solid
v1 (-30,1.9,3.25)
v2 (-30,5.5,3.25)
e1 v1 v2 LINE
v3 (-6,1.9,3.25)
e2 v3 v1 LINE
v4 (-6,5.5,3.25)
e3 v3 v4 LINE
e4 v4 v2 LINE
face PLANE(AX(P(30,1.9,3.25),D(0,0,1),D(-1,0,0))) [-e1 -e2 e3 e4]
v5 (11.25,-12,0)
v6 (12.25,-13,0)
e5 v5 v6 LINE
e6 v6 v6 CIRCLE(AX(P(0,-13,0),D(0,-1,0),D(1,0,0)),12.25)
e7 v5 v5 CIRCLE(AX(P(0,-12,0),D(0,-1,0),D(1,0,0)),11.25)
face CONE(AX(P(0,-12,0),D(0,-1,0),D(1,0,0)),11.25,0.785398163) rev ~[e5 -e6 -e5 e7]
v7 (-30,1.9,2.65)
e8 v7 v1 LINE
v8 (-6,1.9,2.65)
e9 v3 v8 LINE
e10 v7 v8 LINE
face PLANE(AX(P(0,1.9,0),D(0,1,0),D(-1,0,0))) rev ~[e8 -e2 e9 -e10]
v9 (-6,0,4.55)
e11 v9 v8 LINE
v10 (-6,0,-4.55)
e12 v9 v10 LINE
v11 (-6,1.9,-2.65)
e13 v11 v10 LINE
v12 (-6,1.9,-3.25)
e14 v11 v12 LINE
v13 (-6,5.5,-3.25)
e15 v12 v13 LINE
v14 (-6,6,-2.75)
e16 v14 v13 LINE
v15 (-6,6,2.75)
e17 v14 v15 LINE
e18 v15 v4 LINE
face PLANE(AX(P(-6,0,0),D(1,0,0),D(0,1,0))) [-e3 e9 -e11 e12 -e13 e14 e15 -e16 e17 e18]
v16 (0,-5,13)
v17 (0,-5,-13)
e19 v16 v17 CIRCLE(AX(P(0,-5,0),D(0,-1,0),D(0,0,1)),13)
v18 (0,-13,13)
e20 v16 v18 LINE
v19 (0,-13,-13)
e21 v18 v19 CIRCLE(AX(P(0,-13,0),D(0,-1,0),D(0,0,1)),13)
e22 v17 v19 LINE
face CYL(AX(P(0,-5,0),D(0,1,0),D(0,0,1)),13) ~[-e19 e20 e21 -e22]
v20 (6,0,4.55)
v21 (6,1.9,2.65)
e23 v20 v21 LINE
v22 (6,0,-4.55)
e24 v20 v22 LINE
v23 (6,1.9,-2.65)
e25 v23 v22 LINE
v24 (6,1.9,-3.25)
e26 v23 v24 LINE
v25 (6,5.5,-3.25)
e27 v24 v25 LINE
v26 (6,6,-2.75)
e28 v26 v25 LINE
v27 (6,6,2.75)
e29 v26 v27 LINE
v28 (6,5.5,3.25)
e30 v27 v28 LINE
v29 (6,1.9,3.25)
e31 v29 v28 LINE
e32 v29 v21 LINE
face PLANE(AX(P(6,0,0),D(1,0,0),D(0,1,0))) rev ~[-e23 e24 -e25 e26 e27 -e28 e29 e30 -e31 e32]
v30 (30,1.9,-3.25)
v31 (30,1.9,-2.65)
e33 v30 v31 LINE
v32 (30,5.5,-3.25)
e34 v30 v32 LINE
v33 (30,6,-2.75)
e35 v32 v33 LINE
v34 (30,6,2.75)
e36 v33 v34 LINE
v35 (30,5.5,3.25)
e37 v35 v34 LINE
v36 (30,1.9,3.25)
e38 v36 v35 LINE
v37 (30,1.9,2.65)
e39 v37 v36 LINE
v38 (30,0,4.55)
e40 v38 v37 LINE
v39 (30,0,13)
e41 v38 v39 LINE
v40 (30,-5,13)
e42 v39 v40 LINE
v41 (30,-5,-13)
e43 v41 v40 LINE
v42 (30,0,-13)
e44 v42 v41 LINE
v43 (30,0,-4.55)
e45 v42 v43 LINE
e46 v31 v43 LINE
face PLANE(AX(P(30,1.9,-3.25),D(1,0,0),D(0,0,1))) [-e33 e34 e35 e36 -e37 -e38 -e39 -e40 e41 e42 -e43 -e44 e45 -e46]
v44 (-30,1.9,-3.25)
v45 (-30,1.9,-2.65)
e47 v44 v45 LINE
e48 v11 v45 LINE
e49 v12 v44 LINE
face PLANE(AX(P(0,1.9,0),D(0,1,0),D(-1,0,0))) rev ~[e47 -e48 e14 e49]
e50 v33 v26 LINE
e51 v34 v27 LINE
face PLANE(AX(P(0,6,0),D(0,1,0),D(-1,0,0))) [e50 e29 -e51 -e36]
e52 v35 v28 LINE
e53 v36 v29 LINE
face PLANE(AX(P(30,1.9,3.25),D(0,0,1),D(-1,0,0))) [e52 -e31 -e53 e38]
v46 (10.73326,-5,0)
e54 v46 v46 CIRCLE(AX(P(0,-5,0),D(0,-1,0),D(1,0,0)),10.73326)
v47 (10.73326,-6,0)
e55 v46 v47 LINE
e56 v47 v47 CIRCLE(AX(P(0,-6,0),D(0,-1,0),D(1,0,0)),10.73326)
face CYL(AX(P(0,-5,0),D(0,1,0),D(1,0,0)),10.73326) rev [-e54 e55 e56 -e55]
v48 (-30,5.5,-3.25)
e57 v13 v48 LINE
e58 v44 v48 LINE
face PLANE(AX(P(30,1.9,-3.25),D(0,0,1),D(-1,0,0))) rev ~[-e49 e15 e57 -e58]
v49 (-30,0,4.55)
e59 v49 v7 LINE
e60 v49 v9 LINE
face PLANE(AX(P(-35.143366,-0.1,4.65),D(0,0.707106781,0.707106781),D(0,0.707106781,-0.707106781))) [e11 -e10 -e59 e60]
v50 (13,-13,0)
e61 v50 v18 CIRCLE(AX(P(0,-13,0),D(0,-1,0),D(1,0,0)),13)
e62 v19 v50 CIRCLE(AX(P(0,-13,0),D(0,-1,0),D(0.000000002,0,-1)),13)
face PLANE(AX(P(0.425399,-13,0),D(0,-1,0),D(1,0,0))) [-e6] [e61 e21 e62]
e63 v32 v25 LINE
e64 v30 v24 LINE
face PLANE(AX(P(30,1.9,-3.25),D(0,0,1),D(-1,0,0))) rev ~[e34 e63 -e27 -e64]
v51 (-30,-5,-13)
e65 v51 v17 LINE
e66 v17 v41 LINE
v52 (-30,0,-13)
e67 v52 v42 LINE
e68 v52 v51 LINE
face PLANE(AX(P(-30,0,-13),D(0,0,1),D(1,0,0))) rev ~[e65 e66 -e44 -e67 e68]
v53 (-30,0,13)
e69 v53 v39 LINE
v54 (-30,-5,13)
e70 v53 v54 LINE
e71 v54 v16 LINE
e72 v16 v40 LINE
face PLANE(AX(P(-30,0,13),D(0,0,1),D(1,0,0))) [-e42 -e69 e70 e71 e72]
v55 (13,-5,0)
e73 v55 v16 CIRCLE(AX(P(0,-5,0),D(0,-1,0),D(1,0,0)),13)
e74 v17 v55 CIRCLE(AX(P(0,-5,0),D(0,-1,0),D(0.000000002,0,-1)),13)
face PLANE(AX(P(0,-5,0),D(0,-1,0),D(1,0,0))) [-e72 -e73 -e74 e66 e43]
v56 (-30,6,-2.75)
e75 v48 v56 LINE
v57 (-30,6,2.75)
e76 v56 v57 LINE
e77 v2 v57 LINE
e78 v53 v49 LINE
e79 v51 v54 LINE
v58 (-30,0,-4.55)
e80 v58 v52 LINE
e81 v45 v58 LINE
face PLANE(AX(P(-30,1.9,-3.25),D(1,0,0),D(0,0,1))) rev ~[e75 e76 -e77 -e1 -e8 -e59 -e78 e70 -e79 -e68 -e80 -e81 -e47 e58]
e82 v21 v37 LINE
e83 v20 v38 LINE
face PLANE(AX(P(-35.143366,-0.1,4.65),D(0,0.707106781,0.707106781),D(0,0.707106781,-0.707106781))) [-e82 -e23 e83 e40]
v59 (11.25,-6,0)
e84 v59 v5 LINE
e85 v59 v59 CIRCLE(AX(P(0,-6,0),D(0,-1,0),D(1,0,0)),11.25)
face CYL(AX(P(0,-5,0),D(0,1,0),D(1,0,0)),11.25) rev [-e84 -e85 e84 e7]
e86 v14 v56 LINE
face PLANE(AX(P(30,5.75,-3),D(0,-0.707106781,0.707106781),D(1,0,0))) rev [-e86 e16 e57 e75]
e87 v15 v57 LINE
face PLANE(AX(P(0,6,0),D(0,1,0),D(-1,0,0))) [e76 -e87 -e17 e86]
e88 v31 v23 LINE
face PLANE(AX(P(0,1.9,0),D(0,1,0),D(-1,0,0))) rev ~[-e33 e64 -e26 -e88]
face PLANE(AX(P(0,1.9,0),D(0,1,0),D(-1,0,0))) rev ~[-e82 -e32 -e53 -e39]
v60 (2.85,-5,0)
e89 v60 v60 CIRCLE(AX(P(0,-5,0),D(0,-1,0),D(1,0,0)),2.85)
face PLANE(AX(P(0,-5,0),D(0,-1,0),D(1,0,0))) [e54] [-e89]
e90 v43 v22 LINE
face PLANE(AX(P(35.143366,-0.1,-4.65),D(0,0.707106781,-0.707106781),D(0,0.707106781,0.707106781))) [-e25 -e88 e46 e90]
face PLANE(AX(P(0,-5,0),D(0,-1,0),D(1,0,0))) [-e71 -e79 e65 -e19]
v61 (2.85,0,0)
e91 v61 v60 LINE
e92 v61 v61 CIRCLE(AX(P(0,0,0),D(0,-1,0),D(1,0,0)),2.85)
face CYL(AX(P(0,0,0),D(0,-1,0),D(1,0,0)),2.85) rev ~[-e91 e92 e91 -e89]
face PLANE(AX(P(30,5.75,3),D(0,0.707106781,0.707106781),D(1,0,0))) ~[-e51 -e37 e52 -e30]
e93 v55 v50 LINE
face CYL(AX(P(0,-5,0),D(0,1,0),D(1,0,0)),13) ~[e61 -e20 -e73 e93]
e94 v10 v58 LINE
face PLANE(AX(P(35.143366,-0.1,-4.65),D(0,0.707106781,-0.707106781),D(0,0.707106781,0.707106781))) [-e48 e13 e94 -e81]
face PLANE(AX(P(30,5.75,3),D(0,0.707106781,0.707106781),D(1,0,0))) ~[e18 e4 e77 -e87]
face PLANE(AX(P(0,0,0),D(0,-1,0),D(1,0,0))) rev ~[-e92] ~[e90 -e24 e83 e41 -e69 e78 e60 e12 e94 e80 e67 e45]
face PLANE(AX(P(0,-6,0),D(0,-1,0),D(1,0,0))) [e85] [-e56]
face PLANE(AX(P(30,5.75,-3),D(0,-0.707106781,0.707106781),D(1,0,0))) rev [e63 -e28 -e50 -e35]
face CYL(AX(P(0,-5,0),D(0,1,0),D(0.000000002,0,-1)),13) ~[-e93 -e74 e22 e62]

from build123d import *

# Parameters (mm, degrees)
F0_W        = 60
F0_H        = 26
F1_DEPTH    = 5
F2_R        = 11.25
F3_DEPTH    = 8
F4_R        = 11.25
F4_R_2      = 10.7332604818
F5_DEPTH    = 1
F6_SIZE     = 1
F7_W        = 60
F7_H        = 9.3
F8_DEPTH    = 1.9
F9_T4_DEPTH = 70.2867319519
F9_T9_DEPTH = 70.2867319519
F10_W       = 60
F10_H       = 6.5
F11_DEPTH   = 4.1
F12_SIZE    = 0.5
F13_R       = 2.85
F14_DEPTH   = 12.5
F15_W       = 6
F15_H       = 6
F16_DEPTH   = 12.5


# Not quite as in the source:
# - a fillet or chamfer that OpenCascade refuses, or shapes differently, is made with other operations: its cross-section is extruded or revolved along the edge and cut away or added


with BuildPart() as f1:
    # F0 (on Front) → F1 (new body)
    with BuildSketch(Plane.XZ):
        Rectangle(F0_W, F0_H)
    extrude(amount=F1_DEPTH)

    # F2 (on face) → F3 (join)
    with BuildSketch(Plane.XZ.offset(5)):
        with BuildLine():
            ThreePointArc((2.6e-08, -13), (9.1923881646, -9.1923881462), (13, 0))
            ThreePointArc((13, 0), (9.1923881562, 9.1923881546), (2.2e-09, 13))
            ThreePointArc((2.2e-09, 13), (-13, -1.19e-08), (2.6e-08, -13))
        make_face()
        Circle(F2_R, mode=Mode.SUBTRACT)
    extrude(amount=F3_DEPTH)

    # F4 (on face) → F5 (join)
    with BuildSketch(Plane.XZ.offset(5)):
        Circle(F4_R)
        Circle(F4_R_2, mode=Mode.SUBTRACT)
    extrude(amount=F5_DEPTH)

    # F6
    f6_edges = [f1.edges().sort_by_distance(p)[0] for p in [
        (-11.25, -13, 0),
    ]]
    chamfer(f6_edges, length=F6_SIZE)

    # F7 (on face) → F8 (join)
    with BuildSketch(Plane(origin=(0, 0, 0), x_dir=(-1, 0, 0), z_dir=(0, 1, 0))):
        Rectangle(F7_W, F7_H)
    extrude(amount=F8_DEPTH)

    # F9: chamfer of 2 on 2 edges, made by hand


with BuildPart() as f9_tool2:
    # F9_s3 → F9_t4 (new body)
    with BuildSketch(Plane.YZ.offset(-35.1433659759)):
        Polygon((-0.1, 4.65), (1.9, 2.65), (1.9, 4.65), align=None)
    extrude(amount=F9_T4_DEPTH)

    split(bisect_by=Plane.XZ, keep=Keep.BOTTOM)


with BuildPart() as f1_1:
    add(f1.part)

    # F9_t1: cut F9_tool2
    add(f9_tool2.part, mode=Mode.SUBTRACT)


with BuildPart() as f9_tool7:
    # F9_s8 → F9_t9 (new body)
    with BuildSketch(Plane.YZ.offset(35.1433659759)):
        Polygon((-0.1, -4.65), (1.9, -2.65), (1.9, -4.65), align=None)
    extrude(amount=-F9_T9_DEPTH)

    split(bisect_by=Plane.XZ, keep=Keep.BOTTOM)


with BuildPart() as f1_2:
    add(f1_1.part)

    # F9_t6: cut F9_tool7
    add(f9_tool7.part, mode=Mode.SUBTRACT)

    # F10 (on face) → F11 (join)
    with BuildSketch(Plane(origin=(0, 1.9, 0), x_dir=(-1, 0, 0), z_dir=(0, 1, 0))):
        Rectangle(F10_W, F10_H)
    extrude(amount=F11_DEPTH)

    # F12
    f12_edges = [f1_2.edges().sort_by_distance(p)[0] for p in [
        (0, 6, 3.25),
        (0, 6, -3.25),
    ]]
    chamfer(f12_edges, length=F12_SIZE)

    # F13 (on Front) → F14 (cut, symmetric)
    with BuildSketch(Plane.XZ):
        Circle(F13_R)
    extrude(amount=F14_DEPTH, both=True, mode=Mode.SUBTRACT)

    # F15 (on Top) → F16 (cut, symmetric)
    with BuildSketch(Plane.XY):
        with Locations((3, 3)):
            Rectangle(F15_W, F15_H)
        with Locations((-3, 3)):
            Rectangle(F15_W, F15_H)
    extrude(amount=F16_DEPTH, both=True, mode=Mode.SUBTRACT)


solid = f1_2.part
